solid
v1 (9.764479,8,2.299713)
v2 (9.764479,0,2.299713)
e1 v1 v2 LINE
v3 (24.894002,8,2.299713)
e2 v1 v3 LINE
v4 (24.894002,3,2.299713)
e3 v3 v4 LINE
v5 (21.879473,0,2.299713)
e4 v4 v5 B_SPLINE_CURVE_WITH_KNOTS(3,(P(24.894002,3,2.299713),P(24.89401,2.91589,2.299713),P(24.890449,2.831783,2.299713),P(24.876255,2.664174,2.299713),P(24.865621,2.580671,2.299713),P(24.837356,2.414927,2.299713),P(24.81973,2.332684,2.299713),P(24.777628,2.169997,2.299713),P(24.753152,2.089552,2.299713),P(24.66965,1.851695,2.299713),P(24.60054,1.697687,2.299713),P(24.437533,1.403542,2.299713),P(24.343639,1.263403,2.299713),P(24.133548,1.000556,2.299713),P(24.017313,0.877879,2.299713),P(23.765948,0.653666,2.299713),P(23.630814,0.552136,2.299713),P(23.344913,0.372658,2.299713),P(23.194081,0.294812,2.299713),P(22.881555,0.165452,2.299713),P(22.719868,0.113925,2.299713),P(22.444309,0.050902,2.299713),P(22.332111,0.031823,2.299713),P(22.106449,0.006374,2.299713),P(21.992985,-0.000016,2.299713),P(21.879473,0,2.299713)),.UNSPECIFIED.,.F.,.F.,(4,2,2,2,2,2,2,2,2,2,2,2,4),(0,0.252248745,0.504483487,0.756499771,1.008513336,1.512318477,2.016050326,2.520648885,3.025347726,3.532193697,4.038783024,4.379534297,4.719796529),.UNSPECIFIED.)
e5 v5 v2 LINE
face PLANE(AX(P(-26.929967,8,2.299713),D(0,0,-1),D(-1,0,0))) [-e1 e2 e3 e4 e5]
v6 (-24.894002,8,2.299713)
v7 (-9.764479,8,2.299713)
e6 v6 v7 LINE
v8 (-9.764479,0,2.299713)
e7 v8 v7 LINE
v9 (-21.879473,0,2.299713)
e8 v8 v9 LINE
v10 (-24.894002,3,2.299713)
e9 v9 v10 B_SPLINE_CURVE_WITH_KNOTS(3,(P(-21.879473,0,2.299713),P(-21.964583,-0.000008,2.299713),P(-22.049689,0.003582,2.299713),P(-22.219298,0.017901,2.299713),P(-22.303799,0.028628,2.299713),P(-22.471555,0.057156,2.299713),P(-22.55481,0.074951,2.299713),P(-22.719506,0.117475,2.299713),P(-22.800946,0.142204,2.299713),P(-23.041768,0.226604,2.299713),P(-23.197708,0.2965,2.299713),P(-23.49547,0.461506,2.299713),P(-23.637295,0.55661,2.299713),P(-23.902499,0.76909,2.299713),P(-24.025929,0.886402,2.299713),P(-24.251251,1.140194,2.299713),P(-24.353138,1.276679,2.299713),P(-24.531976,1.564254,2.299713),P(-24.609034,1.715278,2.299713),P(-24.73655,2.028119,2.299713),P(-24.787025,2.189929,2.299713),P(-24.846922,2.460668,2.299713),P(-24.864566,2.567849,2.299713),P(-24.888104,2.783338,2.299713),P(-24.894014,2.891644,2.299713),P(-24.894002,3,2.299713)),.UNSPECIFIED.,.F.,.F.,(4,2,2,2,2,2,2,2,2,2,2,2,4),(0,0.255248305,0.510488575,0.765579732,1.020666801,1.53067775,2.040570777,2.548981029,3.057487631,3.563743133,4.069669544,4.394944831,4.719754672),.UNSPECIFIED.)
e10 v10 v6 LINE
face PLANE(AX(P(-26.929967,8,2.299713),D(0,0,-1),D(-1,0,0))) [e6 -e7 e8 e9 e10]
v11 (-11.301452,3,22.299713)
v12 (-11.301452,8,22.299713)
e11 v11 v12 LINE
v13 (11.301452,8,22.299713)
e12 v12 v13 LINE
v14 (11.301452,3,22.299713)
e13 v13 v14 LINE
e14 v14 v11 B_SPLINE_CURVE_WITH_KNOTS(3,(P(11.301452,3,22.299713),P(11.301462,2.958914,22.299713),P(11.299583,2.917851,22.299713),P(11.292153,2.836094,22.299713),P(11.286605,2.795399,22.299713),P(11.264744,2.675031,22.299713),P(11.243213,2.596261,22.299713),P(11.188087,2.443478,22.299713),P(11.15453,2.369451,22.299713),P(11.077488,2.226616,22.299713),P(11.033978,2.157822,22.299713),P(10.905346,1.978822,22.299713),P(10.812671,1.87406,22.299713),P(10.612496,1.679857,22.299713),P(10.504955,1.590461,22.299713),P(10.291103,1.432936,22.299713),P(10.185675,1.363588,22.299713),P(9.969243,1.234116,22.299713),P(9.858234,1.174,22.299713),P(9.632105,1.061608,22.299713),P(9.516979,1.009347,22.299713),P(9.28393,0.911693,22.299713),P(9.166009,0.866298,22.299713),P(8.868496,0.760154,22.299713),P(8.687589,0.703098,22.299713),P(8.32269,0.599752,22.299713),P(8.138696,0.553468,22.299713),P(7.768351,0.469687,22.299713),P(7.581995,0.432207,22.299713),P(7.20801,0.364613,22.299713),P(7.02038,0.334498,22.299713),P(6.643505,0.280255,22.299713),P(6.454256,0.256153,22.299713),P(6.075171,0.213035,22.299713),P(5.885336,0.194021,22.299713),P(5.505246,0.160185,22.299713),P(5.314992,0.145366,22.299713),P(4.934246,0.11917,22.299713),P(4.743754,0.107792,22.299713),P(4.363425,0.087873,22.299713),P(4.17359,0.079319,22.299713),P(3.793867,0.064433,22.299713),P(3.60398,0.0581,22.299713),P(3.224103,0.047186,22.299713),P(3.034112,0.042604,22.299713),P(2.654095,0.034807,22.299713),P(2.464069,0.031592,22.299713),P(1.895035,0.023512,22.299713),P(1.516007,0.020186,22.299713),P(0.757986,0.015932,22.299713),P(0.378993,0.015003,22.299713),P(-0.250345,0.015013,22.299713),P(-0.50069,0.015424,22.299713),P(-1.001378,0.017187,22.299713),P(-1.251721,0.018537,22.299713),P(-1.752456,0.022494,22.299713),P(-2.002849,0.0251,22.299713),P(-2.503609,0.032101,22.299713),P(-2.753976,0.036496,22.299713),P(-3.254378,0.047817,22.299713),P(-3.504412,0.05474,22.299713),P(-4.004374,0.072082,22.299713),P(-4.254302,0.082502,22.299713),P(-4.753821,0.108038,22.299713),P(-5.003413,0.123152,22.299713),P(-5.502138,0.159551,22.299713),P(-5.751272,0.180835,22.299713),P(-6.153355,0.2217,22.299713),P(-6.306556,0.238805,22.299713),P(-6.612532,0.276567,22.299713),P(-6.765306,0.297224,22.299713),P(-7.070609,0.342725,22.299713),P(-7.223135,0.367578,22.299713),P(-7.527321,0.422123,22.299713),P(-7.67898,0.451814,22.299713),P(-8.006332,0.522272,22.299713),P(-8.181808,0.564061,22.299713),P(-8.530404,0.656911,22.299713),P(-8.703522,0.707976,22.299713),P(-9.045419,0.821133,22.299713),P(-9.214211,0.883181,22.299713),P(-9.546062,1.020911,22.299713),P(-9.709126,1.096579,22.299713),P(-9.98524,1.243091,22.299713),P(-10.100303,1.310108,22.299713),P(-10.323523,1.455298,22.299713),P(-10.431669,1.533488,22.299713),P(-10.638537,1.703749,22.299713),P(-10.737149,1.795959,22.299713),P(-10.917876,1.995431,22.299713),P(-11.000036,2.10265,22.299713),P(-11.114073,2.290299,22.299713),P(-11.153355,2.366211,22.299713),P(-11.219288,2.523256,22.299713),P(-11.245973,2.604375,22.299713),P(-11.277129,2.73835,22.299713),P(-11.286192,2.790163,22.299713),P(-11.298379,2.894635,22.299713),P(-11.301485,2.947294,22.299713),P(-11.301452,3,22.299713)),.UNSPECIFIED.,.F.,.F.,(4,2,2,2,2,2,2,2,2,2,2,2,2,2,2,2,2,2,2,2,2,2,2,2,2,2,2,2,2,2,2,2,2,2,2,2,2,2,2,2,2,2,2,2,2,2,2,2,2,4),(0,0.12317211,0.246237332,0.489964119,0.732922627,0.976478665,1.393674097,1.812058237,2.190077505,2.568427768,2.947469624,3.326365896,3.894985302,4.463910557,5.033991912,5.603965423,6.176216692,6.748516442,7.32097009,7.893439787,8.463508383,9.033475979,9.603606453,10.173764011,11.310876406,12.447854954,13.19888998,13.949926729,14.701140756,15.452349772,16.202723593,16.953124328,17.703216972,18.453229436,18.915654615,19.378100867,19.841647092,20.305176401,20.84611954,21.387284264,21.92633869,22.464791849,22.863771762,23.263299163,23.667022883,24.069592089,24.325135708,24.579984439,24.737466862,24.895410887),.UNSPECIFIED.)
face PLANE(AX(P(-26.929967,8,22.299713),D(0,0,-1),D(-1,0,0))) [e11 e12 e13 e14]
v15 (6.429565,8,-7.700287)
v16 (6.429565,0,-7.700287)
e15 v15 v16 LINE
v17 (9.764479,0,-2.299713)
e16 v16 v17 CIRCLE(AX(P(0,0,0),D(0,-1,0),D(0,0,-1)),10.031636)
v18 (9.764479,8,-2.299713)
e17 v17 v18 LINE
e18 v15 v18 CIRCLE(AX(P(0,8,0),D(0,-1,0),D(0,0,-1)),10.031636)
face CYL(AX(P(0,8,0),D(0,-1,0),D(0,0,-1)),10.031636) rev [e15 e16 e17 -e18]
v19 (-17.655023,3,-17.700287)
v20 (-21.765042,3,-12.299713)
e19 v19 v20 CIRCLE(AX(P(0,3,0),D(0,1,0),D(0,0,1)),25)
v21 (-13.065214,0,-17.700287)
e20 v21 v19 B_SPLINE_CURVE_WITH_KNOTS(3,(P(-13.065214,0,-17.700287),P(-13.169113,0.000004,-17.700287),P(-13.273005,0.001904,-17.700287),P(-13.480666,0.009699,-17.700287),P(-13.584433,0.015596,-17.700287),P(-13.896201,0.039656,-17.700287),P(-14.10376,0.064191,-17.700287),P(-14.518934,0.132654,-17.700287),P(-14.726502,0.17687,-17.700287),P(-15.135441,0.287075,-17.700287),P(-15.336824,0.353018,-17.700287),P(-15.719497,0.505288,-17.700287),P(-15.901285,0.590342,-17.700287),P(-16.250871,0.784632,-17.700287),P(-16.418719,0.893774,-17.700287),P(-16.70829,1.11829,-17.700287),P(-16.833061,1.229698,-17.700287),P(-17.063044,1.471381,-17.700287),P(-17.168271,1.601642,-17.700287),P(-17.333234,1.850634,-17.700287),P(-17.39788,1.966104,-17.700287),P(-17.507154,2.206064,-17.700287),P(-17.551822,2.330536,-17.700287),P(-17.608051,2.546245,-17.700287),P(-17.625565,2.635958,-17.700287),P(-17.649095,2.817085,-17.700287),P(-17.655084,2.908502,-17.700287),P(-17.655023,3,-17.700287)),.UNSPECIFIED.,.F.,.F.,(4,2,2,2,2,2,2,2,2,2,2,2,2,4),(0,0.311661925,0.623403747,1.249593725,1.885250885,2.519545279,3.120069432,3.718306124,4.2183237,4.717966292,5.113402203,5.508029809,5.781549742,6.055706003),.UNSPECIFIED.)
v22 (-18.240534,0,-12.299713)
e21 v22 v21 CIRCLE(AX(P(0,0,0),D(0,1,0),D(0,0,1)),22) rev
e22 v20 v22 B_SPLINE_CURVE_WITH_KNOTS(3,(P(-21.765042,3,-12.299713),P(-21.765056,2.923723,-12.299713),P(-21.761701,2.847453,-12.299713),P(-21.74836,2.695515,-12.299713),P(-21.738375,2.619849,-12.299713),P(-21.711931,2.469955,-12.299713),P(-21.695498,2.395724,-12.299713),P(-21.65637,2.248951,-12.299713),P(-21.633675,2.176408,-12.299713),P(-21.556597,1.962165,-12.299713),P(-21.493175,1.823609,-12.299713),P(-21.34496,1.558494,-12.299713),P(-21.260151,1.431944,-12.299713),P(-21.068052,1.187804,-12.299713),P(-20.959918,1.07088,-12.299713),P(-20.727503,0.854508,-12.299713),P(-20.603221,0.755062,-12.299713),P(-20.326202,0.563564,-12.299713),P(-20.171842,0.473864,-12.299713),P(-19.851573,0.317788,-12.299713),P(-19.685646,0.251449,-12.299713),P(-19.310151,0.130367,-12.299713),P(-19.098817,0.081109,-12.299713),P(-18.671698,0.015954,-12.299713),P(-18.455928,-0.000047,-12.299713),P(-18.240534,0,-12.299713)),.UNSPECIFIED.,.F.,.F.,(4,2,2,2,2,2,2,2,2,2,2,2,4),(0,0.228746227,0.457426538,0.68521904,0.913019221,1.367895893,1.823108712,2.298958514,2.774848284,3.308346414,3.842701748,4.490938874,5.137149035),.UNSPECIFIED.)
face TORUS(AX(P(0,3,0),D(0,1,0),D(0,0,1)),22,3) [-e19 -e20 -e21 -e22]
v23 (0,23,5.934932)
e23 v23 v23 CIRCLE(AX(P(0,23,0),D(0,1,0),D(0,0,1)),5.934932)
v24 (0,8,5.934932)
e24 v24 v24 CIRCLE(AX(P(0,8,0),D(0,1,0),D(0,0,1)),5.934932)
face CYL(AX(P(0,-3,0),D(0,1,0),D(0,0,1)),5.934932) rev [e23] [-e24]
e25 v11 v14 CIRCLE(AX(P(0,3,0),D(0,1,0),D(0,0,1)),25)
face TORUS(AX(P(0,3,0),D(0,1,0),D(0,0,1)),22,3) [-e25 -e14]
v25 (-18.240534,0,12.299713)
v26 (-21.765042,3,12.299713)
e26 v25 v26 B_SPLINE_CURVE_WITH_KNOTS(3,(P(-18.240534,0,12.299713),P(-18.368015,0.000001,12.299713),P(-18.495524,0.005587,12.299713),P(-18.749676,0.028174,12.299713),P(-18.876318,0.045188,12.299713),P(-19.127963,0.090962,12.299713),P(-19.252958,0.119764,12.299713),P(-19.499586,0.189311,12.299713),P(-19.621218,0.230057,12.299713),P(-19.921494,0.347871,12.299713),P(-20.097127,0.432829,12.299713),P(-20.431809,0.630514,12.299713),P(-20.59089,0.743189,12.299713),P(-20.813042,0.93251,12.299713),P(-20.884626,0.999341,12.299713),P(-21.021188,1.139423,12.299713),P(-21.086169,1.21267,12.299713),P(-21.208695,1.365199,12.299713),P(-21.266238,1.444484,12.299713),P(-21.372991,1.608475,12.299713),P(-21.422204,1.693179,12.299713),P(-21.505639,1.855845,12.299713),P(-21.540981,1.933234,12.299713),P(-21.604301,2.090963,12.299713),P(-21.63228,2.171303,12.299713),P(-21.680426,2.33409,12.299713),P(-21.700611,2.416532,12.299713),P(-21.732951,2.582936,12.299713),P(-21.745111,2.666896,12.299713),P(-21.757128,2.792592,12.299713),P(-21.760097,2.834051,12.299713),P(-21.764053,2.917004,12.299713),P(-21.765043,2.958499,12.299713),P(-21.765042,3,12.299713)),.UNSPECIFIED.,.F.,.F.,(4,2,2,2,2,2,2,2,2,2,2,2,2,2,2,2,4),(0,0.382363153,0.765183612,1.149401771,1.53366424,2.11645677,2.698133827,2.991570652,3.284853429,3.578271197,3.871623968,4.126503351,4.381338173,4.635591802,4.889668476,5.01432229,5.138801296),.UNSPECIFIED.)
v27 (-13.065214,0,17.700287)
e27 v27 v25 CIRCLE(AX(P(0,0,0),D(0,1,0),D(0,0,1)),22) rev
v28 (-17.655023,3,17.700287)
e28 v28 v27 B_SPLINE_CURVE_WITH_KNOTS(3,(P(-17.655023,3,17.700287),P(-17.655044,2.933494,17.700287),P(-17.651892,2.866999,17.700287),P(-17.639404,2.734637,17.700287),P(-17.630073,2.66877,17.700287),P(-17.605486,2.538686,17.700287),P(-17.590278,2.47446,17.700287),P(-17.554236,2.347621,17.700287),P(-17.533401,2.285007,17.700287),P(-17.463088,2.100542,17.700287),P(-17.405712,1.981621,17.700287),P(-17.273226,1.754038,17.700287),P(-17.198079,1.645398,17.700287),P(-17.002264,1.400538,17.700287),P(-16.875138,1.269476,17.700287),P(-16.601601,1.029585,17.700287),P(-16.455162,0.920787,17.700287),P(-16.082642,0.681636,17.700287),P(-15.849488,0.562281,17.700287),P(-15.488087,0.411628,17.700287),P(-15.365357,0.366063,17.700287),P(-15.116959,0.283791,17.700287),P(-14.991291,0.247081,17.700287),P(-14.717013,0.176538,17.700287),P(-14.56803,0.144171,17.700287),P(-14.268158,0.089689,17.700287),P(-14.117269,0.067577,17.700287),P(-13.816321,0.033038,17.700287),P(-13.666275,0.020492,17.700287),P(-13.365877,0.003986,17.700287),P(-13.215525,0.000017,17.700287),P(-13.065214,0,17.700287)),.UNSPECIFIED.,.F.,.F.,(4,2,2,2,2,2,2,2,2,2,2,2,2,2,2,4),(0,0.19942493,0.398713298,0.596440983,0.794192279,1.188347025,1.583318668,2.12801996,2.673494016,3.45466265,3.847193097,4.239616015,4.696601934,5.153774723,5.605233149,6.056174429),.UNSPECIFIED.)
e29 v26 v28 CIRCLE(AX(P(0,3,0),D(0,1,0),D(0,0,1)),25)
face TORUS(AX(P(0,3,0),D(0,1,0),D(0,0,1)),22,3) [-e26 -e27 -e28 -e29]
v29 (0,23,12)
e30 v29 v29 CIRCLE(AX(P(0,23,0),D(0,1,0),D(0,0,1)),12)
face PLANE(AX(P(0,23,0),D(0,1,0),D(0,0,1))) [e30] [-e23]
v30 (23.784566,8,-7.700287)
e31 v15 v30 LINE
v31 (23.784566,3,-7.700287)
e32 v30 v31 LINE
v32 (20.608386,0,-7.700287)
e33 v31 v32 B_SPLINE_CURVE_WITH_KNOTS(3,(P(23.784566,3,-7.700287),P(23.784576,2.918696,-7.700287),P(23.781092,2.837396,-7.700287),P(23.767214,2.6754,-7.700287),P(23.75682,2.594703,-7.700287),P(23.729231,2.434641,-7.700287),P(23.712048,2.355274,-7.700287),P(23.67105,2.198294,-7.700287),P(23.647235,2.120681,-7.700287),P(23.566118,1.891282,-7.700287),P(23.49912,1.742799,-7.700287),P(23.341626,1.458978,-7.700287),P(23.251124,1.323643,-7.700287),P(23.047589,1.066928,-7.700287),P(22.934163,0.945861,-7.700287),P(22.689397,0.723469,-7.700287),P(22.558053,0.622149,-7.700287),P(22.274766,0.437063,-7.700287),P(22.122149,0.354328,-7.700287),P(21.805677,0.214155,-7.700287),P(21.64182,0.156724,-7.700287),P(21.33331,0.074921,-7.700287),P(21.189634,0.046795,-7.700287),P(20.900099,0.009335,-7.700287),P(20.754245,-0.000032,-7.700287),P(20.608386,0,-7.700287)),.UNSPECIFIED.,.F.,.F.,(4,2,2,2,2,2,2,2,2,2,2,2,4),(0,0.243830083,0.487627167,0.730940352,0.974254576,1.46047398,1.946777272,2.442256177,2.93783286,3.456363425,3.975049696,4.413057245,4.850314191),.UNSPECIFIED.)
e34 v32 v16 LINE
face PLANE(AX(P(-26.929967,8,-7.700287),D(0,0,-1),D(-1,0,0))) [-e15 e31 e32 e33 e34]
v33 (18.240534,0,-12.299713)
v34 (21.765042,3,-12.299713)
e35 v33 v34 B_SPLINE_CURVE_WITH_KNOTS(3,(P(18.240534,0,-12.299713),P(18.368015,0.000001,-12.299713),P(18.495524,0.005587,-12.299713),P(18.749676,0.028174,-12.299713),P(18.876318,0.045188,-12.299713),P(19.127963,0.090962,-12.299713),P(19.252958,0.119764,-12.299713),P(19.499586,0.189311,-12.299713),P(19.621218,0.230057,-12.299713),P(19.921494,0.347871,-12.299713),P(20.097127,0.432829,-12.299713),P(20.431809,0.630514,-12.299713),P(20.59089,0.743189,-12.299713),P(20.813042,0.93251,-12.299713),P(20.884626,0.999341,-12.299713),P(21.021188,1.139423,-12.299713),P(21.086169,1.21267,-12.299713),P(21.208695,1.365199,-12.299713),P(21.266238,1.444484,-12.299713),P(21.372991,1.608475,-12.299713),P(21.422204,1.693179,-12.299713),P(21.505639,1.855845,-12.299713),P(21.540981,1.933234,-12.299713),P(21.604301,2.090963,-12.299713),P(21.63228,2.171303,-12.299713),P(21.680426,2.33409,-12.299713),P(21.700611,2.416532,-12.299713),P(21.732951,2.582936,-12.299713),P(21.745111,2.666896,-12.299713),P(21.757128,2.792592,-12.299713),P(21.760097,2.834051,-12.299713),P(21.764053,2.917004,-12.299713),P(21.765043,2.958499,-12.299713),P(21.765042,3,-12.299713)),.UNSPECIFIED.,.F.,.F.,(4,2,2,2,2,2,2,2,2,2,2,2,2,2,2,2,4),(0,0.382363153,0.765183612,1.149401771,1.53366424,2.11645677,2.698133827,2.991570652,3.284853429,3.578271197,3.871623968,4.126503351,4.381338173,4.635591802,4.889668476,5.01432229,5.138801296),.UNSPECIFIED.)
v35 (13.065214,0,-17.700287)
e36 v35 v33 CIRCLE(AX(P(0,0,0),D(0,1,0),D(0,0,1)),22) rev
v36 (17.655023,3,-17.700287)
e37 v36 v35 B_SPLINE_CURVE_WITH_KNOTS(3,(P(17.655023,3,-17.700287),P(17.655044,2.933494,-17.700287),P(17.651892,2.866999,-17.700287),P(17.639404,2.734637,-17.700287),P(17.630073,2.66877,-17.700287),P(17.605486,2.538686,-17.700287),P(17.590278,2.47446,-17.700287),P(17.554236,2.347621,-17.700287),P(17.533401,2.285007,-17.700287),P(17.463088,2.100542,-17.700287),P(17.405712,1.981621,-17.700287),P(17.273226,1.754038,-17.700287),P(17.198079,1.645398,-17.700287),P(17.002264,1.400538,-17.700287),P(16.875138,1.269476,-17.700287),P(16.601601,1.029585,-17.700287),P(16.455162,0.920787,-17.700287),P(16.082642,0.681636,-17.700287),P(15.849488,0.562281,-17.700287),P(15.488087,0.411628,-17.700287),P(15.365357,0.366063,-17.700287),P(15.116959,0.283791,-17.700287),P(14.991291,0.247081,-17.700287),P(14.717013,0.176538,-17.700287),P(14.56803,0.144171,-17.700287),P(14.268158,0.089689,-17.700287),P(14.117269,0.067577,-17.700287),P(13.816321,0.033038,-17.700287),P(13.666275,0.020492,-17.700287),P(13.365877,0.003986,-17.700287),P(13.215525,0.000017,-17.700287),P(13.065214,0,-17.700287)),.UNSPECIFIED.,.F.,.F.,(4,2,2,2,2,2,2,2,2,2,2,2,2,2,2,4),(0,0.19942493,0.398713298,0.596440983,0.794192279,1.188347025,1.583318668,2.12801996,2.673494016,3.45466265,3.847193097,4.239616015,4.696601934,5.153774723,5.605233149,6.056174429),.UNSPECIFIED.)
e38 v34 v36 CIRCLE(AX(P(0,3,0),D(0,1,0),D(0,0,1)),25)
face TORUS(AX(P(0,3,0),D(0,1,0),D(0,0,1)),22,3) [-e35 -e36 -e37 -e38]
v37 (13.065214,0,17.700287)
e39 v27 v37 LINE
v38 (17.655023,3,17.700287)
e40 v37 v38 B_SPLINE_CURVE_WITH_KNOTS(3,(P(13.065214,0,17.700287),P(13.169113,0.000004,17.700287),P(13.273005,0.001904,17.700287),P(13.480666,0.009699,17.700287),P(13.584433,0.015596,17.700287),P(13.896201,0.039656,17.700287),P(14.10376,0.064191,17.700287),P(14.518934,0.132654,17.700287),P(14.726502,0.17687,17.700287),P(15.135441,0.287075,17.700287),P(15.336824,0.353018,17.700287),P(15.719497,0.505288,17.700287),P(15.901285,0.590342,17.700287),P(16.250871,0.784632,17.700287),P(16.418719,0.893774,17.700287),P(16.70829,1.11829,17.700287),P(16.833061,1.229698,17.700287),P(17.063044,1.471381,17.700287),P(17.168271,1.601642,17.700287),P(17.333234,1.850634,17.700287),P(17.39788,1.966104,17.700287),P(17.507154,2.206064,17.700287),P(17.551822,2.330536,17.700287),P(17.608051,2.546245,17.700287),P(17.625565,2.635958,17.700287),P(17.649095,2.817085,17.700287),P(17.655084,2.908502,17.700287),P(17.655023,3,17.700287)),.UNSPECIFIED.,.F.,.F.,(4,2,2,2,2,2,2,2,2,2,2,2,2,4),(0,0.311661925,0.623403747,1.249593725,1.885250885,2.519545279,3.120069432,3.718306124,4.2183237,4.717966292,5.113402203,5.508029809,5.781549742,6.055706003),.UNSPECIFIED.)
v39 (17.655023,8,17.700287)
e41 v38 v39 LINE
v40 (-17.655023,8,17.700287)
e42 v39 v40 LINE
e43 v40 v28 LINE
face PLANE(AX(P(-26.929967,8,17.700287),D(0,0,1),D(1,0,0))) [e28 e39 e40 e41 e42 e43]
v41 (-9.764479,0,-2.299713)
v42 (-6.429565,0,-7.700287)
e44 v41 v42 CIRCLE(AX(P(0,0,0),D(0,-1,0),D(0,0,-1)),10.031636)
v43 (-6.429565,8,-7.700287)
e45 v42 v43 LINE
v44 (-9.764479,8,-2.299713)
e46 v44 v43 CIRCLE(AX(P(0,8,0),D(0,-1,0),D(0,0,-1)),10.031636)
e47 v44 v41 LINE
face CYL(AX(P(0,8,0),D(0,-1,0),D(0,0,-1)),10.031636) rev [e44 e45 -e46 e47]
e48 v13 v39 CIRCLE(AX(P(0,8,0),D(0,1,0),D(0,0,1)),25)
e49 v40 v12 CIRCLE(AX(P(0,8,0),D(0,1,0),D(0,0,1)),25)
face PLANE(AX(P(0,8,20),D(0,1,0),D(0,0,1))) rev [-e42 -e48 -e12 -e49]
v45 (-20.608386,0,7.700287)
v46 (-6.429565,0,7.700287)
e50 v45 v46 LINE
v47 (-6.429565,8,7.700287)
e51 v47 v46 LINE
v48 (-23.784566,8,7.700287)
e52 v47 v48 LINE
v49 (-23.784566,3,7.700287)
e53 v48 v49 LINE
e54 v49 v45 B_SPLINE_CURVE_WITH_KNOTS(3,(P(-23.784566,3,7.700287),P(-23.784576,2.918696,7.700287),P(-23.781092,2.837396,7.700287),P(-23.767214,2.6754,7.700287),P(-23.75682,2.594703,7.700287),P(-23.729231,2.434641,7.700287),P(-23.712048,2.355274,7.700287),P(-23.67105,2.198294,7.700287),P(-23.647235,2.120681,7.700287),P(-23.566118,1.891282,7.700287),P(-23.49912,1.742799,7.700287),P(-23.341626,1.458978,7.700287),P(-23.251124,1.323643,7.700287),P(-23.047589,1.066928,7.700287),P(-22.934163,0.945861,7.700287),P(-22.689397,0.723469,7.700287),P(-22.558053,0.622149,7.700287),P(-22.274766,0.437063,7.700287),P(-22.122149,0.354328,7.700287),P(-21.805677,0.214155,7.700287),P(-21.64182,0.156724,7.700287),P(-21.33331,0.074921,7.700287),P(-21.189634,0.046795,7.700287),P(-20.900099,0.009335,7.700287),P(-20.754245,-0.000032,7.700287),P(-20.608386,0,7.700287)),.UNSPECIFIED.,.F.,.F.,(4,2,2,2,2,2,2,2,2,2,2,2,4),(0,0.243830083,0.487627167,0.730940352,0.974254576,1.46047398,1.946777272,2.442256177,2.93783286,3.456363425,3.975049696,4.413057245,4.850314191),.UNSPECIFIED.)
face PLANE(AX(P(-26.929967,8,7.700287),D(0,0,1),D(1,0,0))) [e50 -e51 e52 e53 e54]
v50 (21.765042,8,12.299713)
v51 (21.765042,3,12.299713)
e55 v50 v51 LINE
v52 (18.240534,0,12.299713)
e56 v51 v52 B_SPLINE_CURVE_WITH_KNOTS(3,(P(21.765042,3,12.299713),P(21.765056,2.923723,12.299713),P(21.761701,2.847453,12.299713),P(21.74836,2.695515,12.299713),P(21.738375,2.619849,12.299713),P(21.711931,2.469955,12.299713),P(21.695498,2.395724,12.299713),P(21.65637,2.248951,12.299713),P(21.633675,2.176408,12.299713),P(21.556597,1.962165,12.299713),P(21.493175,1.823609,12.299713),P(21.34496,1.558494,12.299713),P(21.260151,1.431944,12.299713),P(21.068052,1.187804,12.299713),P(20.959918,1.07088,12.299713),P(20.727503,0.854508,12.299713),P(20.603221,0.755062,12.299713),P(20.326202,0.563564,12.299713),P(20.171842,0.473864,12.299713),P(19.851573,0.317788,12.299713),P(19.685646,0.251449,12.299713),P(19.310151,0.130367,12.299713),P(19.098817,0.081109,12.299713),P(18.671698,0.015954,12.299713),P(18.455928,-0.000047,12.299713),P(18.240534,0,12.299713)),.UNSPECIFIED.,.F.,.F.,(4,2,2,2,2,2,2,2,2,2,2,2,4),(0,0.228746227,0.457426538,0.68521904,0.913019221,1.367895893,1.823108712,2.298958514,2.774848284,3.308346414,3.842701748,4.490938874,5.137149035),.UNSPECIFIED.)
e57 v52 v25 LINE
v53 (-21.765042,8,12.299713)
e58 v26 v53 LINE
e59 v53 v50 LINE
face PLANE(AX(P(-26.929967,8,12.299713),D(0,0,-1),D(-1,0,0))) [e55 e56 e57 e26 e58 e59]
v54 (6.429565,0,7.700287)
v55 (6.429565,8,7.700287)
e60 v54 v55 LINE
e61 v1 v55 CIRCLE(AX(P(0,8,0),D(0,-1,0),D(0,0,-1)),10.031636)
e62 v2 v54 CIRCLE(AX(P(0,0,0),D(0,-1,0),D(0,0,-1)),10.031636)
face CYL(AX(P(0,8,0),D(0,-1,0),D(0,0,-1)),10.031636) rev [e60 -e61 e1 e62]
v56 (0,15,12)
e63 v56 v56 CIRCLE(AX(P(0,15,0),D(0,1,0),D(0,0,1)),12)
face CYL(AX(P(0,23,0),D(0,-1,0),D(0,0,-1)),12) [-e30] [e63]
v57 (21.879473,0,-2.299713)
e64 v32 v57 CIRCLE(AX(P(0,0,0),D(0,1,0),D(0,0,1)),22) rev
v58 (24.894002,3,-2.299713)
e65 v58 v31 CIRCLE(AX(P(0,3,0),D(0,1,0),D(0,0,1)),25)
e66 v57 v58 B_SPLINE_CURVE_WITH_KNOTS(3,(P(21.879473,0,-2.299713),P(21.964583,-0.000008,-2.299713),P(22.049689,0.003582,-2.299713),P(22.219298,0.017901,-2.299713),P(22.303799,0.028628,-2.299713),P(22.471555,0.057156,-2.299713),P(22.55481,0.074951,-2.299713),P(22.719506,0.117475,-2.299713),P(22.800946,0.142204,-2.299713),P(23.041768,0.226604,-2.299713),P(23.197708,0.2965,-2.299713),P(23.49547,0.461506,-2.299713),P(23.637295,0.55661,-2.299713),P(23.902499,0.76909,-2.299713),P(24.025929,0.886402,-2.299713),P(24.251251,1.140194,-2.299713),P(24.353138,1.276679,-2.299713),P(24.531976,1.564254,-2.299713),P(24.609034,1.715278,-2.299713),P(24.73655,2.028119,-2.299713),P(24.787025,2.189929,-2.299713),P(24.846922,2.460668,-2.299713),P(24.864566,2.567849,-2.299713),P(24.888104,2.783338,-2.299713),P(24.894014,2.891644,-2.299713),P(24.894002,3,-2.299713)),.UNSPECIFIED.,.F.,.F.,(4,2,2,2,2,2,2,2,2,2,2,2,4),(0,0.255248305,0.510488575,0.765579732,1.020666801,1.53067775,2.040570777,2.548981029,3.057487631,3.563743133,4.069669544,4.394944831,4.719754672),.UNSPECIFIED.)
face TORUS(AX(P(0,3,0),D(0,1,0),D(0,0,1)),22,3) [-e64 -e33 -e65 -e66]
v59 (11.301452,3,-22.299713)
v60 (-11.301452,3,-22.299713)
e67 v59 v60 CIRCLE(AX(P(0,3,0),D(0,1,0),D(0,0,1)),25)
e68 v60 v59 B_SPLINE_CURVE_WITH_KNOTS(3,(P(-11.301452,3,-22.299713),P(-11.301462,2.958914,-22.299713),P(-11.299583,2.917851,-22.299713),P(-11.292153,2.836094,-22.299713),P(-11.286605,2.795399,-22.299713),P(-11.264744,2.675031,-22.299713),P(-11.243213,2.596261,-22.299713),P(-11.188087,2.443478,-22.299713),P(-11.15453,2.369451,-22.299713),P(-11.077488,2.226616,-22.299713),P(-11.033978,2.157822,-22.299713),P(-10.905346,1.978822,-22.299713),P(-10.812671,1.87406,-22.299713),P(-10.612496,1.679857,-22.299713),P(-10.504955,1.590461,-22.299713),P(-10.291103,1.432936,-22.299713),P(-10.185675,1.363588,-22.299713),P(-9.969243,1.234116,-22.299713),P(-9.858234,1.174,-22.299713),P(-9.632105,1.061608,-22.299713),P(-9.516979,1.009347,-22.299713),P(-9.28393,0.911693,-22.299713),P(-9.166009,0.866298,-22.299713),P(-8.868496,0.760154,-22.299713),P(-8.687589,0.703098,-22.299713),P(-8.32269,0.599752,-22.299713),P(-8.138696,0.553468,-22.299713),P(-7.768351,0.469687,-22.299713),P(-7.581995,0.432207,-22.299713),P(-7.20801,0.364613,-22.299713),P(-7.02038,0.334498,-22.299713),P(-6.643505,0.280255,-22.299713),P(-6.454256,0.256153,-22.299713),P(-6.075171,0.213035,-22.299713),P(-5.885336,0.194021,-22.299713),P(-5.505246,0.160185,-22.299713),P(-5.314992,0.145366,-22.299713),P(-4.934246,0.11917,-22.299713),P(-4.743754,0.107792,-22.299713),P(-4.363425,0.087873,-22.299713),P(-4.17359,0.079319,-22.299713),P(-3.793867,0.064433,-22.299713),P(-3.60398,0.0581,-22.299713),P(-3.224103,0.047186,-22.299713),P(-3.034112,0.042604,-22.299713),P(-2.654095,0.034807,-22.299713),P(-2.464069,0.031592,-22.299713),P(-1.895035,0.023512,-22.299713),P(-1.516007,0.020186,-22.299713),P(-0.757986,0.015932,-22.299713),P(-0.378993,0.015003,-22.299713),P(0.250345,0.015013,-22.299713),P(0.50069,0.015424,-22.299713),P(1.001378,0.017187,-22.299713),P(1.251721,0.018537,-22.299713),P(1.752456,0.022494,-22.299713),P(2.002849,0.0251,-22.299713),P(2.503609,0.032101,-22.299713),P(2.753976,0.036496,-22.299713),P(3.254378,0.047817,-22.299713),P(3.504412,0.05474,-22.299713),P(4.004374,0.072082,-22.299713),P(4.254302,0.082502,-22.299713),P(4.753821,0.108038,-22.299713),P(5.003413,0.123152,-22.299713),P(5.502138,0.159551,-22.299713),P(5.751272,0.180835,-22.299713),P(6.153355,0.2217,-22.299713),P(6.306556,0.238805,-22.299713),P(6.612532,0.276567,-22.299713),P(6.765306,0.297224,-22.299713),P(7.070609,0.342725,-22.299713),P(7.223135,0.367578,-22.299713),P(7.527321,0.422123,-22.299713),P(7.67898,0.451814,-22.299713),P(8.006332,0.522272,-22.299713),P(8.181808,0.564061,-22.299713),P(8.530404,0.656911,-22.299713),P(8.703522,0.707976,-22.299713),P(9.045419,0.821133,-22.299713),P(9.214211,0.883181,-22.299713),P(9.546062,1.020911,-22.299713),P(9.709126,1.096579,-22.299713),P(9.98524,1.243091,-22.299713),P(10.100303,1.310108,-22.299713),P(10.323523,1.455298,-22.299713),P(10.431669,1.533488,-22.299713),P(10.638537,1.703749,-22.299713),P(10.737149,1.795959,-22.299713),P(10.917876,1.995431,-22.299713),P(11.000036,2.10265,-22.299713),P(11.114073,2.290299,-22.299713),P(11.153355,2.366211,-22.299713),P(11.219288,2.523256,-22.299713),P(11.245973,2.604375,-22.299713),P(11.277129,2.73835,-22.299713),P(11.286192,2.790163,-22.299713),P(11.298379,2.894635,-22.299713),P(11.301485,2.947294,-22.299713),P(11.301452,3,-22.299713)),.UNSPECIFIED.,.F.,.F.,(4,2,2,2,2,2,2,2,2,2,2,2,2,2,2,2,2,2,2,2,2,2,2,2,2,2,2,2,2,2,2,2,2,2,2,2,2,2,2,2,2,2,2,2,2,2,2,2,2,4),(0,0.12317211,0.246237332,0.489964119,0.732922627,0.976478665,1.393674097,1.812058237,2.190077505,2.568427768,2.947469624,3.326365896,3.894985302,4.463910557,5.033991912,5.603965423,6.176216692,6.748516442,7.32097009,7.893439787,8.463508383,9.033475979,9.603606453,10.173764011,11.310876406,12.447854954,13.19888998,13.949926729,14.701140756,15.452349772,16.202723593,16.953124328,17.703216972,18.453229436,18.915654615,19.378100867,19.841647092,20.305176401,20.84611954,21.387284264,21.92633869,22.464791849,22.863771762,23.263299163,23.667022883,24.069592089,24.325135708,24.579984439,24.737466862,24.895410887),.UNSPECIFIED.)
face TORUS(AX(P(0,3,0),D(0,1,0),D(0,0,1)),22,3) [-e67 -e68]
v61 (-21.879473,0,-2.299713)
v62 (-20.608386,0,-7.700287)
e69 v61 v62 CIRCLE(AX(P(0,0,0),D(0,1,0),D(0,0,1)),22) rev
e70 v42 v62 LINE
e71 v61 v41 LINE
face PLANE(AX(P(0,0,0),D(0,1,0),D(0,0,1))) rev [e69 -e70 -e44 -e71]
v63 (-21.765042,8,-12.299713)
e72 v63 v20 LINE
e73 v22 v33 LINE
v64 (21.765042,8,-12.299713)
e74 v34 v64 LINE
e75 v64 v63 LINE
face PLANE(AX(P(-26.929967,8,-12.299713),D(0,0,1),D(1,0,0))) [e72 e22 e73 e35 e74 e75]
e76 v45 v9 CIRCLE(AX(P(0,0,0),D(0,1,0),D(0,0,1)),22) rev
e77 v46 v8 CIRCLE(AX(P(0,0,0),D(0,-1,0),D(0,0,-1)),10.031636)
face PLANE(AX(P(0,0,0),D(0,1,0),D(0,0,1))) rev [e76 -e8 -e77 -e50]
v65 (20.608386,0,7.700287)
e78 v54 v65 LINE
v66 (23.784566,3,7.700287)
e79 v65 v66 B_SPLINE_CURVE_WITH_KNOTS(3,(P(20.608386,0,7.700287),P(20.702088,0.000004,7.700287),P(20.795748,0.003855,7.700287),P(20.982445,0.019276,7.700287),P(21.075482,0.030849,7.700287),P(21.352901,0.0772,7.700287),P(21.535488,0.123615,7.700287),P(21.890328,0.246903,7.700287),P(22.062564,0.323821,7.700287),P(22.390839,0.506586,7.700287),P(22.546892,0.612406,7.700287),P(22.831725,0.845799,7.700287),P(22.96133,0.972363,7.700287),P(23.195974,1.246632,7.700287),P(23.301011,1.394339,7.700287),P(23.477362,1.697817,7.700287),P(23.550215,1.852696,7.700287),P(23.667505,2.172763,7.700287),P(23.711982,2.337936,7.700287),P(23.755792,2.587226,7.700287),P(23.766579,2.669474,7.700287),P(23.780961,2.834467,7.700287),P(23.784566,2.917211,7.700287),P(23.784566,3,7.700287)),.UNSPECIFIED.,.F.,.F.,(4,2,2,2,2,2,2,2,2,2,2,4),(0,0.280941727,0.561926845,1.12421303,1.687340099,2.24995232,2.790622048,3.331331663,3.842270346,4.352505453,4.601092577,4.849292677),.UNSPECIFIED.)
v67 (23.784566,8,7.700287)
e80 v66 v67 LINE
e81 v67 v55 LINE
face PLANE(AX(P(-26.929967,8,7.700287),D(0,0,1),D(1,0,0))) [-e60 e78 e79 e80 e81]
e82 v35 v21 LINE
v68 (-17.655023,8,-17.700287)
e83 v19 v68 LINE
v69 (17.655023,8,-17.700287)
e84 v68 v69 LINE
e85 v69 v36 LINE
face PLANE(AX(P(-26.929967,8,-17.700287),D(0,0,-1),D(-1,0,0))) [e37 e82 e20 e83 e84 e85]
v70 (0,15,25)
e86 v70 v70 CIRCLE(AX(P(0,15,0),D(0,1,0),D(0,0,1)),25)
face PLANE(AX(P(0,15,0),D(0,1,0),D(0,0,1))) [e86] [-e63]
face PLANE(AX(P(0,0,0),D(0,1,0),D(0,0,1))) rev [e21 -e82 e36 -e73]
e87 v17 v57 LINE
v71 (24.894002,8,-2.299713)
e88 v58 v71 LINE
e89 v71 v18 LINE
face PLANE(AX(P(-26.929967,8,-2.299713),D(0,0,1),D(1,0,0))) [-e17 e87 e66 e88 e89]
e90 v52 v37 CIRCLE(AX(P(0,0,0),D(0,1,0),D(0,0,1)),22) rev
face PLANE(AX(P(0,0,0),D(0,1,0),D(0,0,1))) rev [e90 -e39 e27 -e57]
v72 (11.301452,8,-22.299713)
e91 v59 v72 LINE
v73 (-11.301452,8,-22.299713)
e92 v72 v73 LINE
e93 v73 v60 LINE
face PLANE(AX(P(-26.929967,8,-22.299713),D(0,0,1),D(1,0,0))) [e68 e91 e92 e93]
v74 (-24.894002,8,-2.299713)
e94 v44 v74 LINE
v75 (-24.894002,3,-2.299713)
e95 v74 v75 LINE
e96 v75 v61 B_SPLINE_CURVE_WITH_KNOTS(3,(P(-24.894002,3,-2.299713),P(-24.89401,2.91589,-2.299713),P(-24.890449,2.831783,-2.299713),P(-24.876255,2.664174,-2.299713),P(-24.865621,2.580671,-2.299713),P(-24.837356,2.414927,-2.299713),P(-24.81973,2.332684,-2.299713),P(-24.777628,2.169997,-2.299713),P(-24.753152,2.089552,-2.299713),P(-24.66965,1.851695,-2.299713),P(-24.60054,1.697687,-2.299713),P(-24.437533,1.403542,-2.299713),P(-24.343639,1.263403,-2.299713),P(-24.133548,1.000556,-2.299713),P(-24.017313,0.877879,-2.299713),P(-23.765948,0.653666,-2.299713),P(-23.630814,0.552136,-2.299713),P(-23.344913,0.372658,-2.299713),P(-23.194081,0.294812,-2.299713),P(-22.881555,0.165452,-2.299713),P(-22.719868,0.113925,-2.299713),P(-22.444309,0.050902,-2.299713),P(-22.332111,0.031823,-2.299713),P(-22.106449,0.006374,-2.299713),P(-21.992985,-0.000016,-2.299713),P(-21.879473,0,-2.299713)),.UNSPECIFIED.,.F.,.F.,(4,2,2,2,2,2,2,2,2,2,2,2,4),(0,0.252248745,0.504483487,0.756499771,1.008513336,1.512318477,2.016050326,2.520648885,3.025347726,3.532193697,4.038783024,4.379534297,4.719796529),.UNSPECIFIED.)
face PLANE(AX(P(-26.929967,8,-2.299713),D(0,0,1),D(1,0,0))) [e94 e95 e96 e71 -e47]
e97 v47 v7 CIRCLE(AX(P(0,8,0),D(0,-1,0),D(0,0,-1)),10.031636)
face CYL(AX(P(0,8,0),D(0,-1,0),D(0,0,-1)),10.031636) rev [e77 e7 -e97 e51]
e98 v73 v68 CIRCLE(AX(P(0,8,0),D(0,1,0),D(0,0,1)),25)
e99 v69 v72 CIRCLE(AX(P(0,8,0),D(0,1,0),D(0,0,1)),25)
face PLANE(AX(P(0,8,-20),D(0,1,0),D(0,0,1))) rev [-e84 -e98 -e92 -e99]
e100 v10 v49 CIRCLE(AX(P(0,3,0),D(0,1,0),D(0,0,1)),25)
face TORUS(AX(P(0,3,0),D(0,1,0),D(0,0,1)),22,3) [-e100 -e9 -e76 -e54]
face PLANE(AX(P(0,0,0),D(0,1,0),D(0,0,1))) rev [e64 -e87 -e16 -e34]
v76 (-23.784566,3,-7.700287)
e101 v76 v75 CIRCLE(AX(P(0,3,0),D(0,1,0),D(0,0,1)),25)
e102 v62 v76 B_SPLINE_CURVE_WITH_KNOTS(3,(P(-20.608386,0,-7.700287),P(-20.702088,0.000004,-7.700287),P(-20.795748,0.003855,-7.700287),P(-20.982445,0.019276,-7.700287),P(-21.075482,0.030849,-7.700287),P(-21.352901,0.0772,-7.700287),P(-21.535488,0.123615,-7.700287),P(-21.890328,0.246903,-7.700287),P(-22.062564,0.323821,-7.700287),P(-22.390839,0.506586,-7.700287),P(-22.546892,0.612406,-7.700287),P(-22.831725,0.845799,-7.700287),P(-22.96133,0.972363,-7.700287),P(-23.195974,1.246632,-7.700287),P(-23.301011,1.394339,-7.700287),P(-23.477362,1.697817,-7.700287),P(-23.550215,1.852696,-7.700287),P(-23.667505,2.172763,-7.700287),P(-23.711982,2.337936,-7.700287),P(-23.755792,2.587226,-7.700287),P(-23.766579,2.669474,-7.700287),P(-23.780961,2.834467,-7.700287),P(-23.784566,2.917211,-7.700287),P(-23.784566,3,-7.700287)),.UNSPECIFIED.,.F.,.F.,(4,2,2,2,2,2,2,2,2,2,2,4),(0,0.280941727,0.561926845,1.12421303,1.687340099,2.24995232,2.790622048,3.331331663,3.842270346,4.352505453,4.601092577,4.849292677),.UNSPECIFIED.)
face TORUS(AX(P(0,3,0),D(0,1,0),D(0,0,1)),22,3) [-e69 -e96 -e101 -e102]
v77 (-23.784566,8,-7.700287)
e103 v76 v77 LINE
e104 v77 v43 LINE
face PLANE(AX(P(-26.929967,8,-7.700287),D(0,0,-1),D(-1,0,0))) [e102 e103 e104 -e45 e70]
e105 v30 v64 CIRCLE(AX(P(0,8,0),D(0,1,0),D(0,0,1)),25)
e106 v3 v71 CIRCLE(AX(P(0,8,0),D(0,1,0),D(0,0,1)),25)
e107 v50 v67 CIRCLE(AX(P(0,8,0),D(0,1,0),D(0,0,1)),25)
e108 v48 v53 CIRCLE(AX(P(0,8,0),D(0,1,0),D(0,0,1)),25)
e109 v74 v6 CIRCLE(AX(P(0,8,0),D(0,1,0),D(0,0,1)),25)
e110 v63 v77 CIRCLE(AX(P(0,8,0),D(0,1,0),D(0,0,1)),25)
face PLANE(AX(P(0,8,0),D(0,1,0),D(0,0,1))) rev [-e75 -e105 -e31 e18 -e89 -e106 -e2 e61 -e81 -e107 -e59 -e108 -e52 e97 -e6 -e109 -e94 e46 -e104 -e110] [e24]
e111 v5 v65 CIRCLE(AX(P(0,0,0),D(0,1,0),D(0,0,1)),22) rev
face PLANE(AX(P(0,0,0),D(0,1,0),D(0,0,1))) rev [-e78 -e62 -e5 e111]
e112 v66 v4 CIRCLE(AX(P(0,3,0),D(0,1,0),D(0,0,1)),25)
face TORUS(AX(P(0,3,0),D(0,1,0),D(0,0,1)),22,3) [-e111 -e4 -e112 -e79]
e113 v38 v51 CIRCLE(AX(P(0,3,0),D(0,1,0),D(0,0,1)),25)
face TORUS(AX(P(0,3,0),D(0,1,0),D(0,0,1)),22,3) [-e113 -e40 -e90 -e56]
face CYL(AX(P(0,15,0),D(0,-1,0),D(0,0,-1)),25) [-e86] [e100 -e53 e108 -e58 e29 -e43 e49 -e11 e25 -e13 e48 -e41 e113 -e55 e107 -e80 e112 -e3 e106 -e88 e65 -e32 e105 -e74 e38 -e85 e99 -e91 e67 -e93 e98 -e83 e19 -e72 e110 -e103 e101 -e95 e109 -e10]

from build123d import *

# Parameters (mm, degrees)
SKETCH1_R             = 25
BOSS_EXTRUDE1_DEPTH   = 15
SKETCH14_W            = 53.859934174
SKETCH14_H            = 4.599425072
CUT_EXTRUDE13_DEPTH   = 8
LPATTERN11_COUNT      = 4
LPATTERN11_PITCH      = 10
LPATTERN11_COUNT_DIR2 = 4
LPATTERN11_PITCH_DIR2 = 10
SKETCH18_R            = 10.031636401
CUT_EXTRUDE15_DEPTH   = 8
SKETCH16_R            = 12
BOSS_EXTRUDE3_DEPTH   = 8
SKETCH19_R            = 5.934931829
CUT_EXTRUDE16_DEPTH   = 26
FILLET2_R             = 3
FILLET3_R             = 3


with BuildPart() as part:
    # Sketch1 → Boss-Extrude1 (new body)
    with BuildSketch(Plane(origin=(0, 0, 0), x_dir=(1, 0, 0), z_dir=(0, 1, 0))):
        with Locations(Location((0, 0, 0), (0, 0, 270))):
            Circle(SKETCH1_R)
    extrude(amount=BOSS_EXTRUDE1_DEPTH)

    # Sketch14 → Cut-Extrude13 (cut)
    with BuildSketch(Plane(origin=(0, 0, 0), x_dir=(1, 0, 0), z_dir=(0, 1, 0))):
        Rectangle(SKETCH14_W, SKETCH14_H)
    cut_extrude13 = extrude(amount=CUT_EXTRUDE13_DEPTH, mode=Mode.SUBTRACT)

    # LPattern11: Cut-Extrude13 4 × 4
    with Locations(*[Vector(0, 0, 1) * (i * LPATTERN11_PITCH) + Vector(0, 0, -1) * (j * LPATTERN11_PITCH_DIR2) for i in range(LPATTERN11_COUNT) for j in range(LPATTERN11_COUNT_DIR2) if (i, j) != (0, 0)]):
        add(cut_extrude13, mode=Mode.SUBTRACT)

    # Sketch18 → Cut-Extrude15 (cut)
    with BuildSketch(Plane.XZ):
        Circle(SKETCH18_R)
    extrude(amount=-CUT_EXTRUDE15_DEPTH, mode=Mode.SUBTRACT)

    # Sketch16 → Boss-Extrude3 (add)
    with BuildSketch(Plane(origin=(0, 15, 0), x_dir=(1, 0, 0), z_dir=(0, 1, 0))):
        with Locations(Location((0, 0, 0), (0, 0, 270))):
            Circle(SKETCH16_R)
    extrude(amount=BOSS_EXTRUDE3_DEPTH)

    # Sketch19 → Cut-Extrude16 (cut)
    with BuildSketch(Plane(origin=(0, 23, 0), x_dir=(1, 0, 0), z_dir=(0, 1, 0))):
        with Locations(Location((0, 0, 0), (0, 0, 270))):
            Circle(SKETCH19_R)
    extrude(amount=-CUT_EXTRUDE16_DEPTH, mode=Mode.SUBTRACT)

    # Fillet2
    # the kernel refuses this fillet: 3 mm, written as the material it takes off along each edge
    with BuildSketch(Plane(origin=(0, 0, 0), x_dir=(0, 0, 1), z_dir=(-1, 0, 0))) as fillet2_piece_1_section:
        with BuildLine():
            CenterArc((25 - FILLET2_R, FILLET2_R), FILLET2_R, 270, 90)
            Line((25 - FILLET2_R, 0), (25, 0))
            Line((25, 0), (25, FILLET2_R))
        make_face()
    fillet2_piece_1 = revolve(axis=Axis((0, 0, 0), (0, 1, 0)), revolution_arc=44.06515492, mode=Mode.PRIVATE)
    fillet2_piece_1 = split(fillet2_piece_1, bisect_by=Plane(origin=(5.02070906, 0.724658167, 17.700287464), z_dir=(0, 0, 1)), keep=Keep.TOP, mode=Mode.PRIVATE)
    add(fillet2_piece_1, mode=Mode.SUBTRACT)
    with BuildSketch(Plane(origin=(0, 0, 0), x_dir=(-0.6954759312446767, 0, 0.7185493922197345), z_dir=(-0.7185493922197345, 0, -0.6954759312446767))) as fillet2_piece_2_section:
        with BuildLine():
            CenterArc((25 - FILLET2_R, FILLET2_R), FILLET2_R, 270, 90)
            Line((25 - FILLET2_R, 0), (25, 0))
            Line((25, 0), (25, FILLET2_R))
        make_face()
    fillet2_piece_2 = revolve(axis=Axis((0, 0, 0), (0, 1, 0)), revolution_arc=44.06515492, mode=Mode.PRIVATE)
    fillet2_piece_2 = split(fillet2_piece_2, bisect_by=Plane(origin=(-5.02071043, 0.724658948, 17.700287464), z_dir=(0, 0, 1)), keep=Keep.TOP, mode=Mode.PRIVATE)
    add(fillet2_piece_2, mode=Mode.SUBTRACT)

    # Fillet3
    # the kernel refuses this fillet: 3 mm, written as the material it takes off along each edge
    with BuildSketch(Plane(origin=(0, 0, 0), x_dir=(0.6954990930978064, 0, -0.7185269733977484), z_dir=(0.7185269733977484, 0, 0.6954990930978064))) as fillet3_piece_1:
        with BuildLine():
            CenterArc((25 - FILLET3_R, FILLET3_R), FILLET3_R, 270, 90)
            Line((25 - FILLET3_R, 0), (25, 0))
            Line((25, 0), (25, FILLET3_R))
        make_face()
    revolve(axis=Axis((0, 0, 0), (0, 1, 0)), revolution_arc=88.134003662, mode=Mode.SUBTRACT)
    with BuildSketch(Plane(origin=(0, 0, 0), x_dir=(0.9771108822908511, 0, -0.21273063650728477), z_dir=(0.21273063650728477, 0, 0.9771108822908511))) as fillet3_piece_2:
        with BuildLine():
            CenterArc((25 - FILLET3_R, FILLET3_R), FILLET3_R, 270, 90)
            Line((25 - FILLET3_R, 0), (25, 0))
            Line((25, 0), (25, FILLET3_R))
        make_face()
    revolve(axis=Axis((0, 0, 0), (0, 1, 0)), revolution_arc=49.979873443, mode=Mode.SUBTRACT)
    with BuildSketch(Plane(origin=(0, 0, 0), x_dir=(-0.46542458400640074, 0, -0.8850875417733937), z_dir=(0.8850875417733937, 0, -0.46542458400640074))) as fillet3_piece_3:
        with BuildLine():
            CenterArc((25 - FILLET3_R, FILLET3_R), FILLET3_R, 270, 90)
            Line((25 - FILLET3_R, 0), (25, 0))
            Line((25, 0), (25, FILLET3_R))
        make_face()
    revolve(axis=Axis((0, 0, 0), (0, 1, 0)), revolution_arc=49.979873443, mode=Mode.SUBTRACT)
    with BuildSketch(Plane(origin=(0, 0, 0), x_dir=(0.9784698974402165, 0, 0.20638958259401557), z_dir=(-0.20638958259401557, 0, 0.9784698974402165))) as fillet3_piece_4:
        with BuildLine():
            CenterArc((25 - FILLET3_R, FILLET3_R), FILLET3_R, 270, 90)
            Line((25 - FILLET3_R, 0), (25, 0))
            Line((25, 0), (25, FILLET3_R))
        make_face()
    revolve(axis=Axis((0, 0, 0), (0, 1, 0)), revolution_arc=47.03916142, mode=Mode.SUBTRACT)
    with BuildSketch(Plane(origin=(0, 0, 0), x_dir=(-0.8178655518658356, 0, -0.5754093665132607), z_dir=(0.5754093665132607, 0, -0.8178655518658356))) as fillet3_piece_5:
        with BuildLine():
            CenterArc((25 - FILLET3_R, FILLET3_R), FILLET3_R, 270, 90)
            Line((25 - FILLET3_R, 0), (25, 0))
            Line((25, 0), (25, FILLET3_R))
        make_face()
    revolve(axis=Axis((0, 0, 0), (0, 1, 0)), revolution_arc=47.03916142, mode=Mode.SUBTRACT)
    with BuildSketch(Plane(origin=(0, 0, 0), x_dir=(0.8178655518658215, 0, 0.5754093665132807), z_dir=(-0.5754093665132807, 0, 0.8178655518658215))) as fillet3_piece_6:
        with BuildLine():
            CenterArc((25 - FILLET3_R, FILLET3_R), FILLET3_R, 270, 90)
            Line((25 - FILLET3_R, 0), (25, 0))
            Line((25, 0), (25, FILLET3_R))
        make_face()
    revolve(axis=Axis((0, 0, 0), (0, 1, 0)), revolution_arc=47.03916142, mode=Mode.SUBTRACT)
    with BuildSketch(Plane(origin=(0, 0, 0), x_dir=(-0.9784698974402178, 0, -0.20638958259400958), z_dir=(0.20638958259400958, 0, -0.9784698974402178))) as fillet3_piece_7:
        with BuildLine():
            CenterArc((25 - FILLET3_R, FILLET3_R), FILLET3_R, 270, 90)
            Line((25 - FILLET3_R, 0), (25, 0))
            Line((25, 0), (25, FILLET3_R))
        make_face()
    revolve(axis=Axis((0, 0, 0), (0, 1, 0)), revolution_arc=47.03916142, mode=Mode.SUBTRACT)
    with BuildSketch(Plane(origin=(0, 0, 0), x_dir=(0.4654245840063838, 0, 0.8850875417734027), z_dir=(-0.8850875417734027, 0, 0.4654245840063838))) as fillet3_piece_8:
        with BuildLine():
            CenterArc((25 - FILLET3_R, FILLET3_R), FILLET3_R, 270, 90)
            Line((25 - FILLET3_R, 0), (25, 0))
            Line((25, 0), (25, FILLET3_R))
        make_face()
    revolve(axis=Axis((0, 0, 0), (0, 1, 0)), revolution_arc=49.979873443, mode=Mode.SUBTRACT)
    with BuildSketch(Plane(origin=(0, 0, 0), x_dir=(-0.9771108822908537, 0, 0.2127306365072725), z_dir=(-0.2127306365072725, 0, -0.9771108822908537))) as fillet3_piece_9:
        with BuildLine():
            CenterArc((25 - FILLET3_R, FILLET3_R), FILLET3_R, 270, 90)
            Line((25 - FILLET3_R, 0), (25, 0))
            Line((25, 0), (25, FILLET3_R))
        make_face()
    revolve(axis=Axis((0, 0, 0), (0, 1, 0)), revolution_arc=49.979873443, mode=Mode.SUBTRACT)


solid = part.part
